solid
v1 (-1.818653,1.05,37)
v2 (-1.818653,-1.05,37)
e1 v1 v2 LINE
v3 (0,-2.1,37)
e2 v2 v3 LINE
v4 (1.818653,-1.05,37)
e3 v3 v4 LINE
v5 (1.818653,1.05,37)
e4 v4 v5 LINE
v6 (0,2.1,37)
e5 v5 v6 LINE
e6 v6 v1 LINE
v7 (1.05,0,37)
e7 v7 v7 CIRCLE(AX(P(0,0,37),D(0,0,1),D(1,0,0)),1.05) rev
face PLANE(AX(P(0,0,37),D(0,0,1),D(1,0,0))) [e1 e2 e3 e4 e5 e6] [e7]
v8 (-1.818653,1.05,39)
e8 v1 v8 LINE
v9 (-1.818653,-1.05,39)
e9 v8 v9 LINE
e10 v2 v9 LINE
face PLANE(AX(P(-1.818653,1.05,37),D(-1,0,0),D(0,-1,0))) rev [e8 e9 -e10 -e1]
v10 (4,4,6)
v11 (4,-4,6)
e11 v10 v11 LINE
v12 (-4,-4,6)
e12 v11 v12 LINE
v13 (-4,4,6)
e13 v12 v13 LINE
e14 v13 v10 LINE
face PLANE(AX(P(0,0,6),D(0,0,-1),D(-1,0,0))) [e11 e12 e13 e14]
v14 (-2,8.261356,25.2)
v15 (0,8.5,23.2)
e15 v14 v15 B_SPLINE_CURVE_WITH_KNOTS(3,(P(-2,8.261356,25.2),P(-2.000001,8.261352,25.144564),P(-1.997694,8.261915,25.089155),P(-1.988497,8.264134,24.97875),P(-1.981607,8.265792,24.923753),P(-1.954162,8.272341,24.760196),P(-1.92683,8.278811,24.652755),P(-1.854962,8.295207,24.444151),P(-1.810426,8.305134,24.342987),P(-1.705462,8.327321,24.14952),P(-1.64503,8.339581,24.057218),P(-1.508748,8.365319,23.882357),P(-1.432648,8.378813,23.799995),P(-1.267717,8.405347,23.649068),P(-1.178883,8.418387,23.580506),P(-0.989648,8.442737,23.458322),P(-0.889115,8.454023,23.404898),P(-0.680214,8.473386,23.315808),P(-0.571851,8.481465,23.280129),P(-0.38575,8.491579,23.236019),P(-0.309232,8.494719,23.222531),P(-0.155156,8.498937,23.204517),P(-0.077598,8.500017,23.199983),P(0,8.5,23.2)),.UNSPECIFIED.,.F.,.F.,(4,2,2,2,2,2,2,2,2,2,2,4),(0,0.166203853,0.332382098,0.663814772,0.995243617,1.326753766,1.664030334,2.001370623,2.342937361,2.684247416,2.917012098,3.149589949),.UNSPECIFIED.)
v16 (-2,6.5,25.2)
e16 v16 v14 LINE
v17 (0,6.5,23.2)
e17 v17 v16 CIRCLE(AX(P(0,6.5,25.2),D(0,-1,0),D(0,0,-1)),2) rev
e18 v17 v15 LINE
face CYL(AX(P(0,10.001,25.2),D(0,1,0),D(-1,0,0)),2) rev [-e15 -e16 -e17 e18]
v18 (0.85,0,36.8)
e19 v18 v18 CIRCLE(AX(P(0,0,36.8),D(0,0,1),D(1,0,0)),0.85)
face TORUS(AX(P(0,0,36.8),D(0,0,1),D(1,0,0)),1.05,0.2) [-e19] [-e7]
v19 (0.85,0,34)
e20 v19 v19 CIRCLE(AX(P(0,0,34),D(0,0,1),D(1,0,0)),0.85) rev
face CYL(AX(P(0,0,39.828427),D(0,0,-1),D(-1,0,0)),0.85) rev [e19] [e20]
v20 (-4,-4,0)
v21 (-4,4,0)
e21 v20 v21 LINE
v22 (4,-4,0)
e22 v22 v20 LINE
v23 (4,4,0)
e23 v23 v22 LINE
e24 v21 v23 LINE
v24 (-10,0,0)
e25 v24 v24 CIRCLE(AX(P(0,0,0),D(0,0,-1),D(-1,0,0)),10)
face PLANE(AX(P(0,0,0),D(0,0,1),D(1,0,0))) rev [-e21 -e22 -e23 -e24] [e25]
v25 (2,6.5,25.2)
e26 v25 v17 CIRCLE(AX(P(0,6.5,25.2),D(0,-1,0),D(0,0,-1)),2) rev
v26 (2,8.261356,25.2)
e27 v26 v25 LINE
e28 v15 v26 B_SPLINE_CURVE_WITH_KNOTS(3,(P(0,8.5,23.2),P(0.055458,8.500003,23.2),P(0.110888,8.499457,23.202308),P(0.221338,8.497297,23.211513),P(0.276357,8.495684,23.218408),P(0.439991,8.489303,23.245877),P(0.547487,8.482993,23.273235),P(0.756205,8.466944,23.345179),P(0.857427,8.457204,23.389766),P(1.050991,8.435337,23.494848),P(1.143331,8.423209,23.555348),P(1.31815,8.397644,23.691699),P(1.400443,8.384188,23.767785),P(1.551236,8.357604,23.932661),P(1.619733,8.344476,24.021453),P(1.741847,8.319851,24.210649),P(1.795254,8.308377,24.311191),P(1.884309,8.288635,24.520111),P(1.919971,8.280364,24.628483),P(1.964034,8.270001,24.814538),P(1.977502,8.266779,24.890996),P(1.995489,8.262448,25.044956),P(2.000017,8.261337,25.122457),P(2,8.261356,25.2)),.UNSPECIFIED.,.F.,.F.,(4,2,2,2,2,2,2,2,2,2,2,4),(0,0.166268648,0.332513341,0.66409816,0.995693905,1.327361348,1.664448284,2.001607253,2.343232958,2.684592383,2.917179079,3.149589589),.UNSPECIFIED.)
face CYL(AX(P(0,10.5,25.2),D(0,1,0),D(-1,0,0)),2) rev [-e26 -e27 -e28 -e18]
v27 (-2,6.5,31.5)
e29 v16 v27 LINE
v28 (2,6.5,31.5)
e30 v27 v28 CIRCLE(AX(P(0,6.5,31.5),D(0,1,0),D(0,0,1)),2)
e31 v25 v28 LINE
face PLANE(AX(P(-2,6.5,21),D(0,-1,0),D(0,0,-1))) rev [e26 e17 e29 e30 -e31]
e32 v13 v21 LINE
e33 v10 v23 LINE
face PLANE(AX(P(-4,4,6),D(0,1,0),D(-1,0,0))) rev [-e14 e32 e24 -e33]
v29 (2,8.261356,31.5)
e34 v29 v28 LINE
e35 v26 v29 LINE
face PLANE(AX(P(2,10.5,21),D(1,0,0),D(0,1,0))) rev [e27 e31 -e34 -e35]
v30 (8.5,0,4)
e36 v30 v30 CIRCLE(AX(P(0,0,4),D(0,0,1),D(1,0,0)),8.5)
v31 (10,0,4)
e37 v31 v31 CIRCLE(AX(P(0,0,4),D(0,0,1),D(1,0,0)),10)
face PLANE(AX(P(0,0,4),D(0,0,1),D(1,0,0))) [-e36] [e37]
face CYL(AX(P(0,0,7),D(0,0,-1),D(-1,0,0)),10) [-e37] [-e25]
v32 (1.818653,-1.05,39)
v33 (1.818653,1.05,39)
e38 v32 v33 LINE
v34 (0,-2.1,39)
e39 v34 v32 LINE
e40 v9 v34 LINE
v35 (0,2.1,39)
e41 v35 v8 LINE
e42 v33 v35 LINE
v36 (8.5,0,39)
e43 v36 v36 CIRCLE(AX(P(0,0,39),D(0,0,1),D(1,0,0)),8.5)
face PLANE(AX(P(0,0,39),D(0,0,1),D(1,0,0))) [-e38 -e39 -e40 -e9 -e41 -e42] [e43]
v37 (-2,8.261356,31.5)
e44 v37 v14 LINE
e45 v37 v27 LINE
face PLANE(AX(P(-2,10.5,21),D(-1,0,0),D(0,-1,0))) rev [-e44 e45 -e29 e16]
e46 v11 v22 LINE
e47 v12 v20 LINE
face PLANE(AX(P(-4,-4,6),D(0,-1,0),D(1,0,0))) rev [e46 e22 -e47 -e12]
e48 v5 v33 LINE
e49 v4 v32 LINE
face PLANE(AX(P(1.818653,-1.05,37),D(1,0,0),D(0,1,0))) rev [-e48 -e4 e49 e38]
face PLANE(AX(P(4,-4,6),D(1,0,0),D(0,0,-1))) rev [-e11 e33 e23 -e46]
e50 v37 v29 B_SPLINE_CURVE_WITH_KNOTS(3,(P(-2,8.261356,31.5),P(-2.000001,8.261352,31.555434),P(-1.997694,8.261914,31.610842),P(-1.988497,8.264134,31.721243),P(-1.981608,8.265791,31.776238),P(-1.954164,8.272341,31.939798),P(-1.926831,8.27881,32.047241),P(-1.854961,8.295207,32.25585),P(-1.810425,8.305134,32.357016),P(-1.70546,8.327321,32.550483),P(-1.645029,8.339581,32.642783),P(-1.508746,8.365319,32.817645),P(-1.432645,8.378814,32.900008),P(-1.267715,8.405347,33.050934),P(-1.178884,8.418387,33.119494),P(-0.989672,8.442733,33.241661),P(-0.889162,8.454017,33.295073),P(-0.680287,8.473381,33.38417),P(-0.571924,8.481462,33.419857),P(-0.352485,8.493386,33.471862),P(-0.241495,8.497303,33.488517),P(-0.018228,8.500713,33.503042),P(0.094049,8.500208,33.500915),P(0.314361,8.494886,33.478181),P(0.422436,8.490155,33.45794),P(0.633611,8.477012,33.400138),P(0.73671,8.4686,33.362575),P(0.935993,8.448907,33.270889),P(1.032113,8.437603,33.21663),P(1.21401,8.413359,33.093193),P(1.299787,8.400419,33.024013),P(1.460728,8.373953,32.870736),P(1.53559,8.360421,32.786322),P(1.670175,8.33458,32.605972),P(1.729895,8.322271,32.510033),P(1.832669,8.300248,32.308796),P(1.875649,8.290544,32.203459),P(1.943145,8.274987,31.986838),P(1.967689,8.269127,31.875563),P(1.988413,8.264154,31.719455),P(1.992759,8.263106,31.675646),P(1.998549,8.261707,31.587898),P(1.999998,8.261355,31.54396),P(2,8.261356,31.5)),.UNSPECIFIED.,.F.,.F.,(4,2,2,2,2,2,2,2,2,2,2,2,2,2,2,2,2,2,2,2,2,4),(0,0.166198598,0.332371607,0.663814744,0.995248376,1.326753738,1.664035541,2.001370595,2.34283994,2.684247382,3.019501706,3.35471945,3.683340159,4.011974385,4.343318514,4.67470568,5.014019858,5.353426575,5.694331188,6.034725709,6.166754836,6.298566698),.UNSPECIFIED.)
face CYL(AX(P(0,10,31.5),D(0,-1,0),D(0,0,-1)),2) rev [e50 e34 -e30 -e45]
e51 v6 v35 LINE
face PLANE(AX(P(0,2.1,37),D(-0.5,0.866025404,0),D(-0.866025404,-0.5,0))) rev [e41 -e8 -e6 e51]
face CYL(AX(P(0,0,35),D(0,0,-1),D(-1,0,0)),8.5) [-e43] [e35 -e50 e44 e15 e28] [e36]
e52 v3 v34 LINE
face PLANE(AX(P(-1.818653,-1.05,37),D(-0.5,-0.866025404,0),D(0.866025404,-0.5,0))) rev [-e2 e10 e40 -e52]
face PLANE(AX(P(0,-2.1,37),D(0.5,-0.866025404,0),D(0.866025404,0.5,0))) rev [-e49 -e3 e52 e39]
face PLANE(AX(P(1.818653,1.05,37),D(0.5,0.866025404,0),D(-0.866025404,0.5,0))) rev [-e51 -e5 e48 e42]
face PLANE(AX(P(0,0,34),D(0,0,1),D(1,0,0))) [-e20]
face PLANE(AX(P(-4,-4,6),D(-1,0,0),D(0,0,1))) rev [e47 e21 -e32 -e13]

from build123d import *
from build123d.topology import SkipClean

# Parameters (mm, degrees)
SKETCH_1_R           = 8.5
EXTRUDE_1_DEPTH      = 35
SKETCH_3_W           = 4
SKETCH_3_H           = 4
CUT_EXTRUDE_1_DEPTH  = 14
EXTRUDE_2_REACH      = 41.016
EXTRUDE_2_END_RADIUS = 8.5
EXTRUDE_3_REACH      = 41.016
EXTRUDE_3_END_RADIUS = 8.5
SKETCH_6_R           = 10
SKETCH_6_R_2         = 8.5
EXTRUDE_4_DEPTH      = 7
SKETCH_7_R           = 8.5
EXTRUDE_5_DEPTH      = 3
EXTRUDE_6_REACH      = 44.617
EXTRUDE_6_END_RADIUS = 8.5
CUT_EXTRUDE_2_DEPTH  = 43.617484675
FILLET_1_R           = 2
CUT_EXTRUDE_START    = -3
SKETCH_10_R          = 10
SKETCH_10_R_2        = 8.5
CUT_EXTRUDE_3_DEPTH  = 3
SKETCH_11_R          = 8.5
EXTRUDE_7_DEPTH      = 1
SKETCH_12_R          = 1
CUT_EXTRUDE_4_DEPTH  = 5
CUT_EXTRUDE_5_DEPTH  = 2
EXTRUDE_START        = 3
SKETCH_14_R          = 1
SKETCH_14_R_2        = 0.85
EXTRUDE_8_DEPTH      = 3
FILLET_2_R           = 0.2
SKETCH_15_W          = 8
SKETCH_15_H          = 8
CUT_EXTRUDE_6_DEPTH  = 6


with BuildPart() as part:
    # 草图1 → 凸台-拉伸1 (new body)
    with BuildSketch(Plane.XY):
        Circle(SKETCH_1_R)
    extrude(amount=EXTRUDE_1_DEPTH)

    # 草图3 → 切除-拉伸1 (cut)
    with BuildSketch(Plane.XY.offset(35)):
        with Locations((0, 8.5)):
            Rectangle(SKETCH_3_W, SKETCH_3_H)
    extrude(amount=-CUT_EXTRUDE_1_DEPTH, mode=Mode.SUBTRACT)

    # 凸台-拉伸2: up to this cylinder (the profile starts inside it)
    with SkipClean():  # the faces are left unmerged after this step: merging them gives an invalid solid
        extrude_2_end = Plane(origin=(0, 0, 21.446736), z_dir=(0, 0, -1)) * Cylinder(EXTRUDE_2_END_RADIUS, 100.032, mode=Mode.PRIVATE)
        # 草图4 → 凸台-拉伸2 (add, up to the surface)
        with BuildSketch(Plane(origin=(0, 6.5, 0), x_dir=(1, 0, 0), z_dir=(0, 1, 0)), mode=Mode.PRIVATE) as extrude_2_sk1:
            with BuildLine():
                Line((2, -21), (0, -21))
                ThreePointArc((0, -21), (1.414213562, -21.585786438), (2, -23))
                Line((2, -23), (2, -21))
            make_face()
        extrude_2_tool1 = extrude(extrude_2_sk1.sketch, amount=EXTRUDE_2_REACH, mode=Mode.PRIVATE) & extrude_2_end
        add(extrude_2_tool1.solids().sort_by_distance((1.553264, 6.5, 21.446736))[0])
        # 草图4 → 凸台-拉伸2 (add, up to the surface)
        with BuildSketch(Plane(origin=(0, 6.5, 0), x_dir=(1, 0, 0), z_dir=(0, 1, 0)), mode=Mode.PRIVATE) as extrude_2_sk2:
            with BuildLine():
                Line((-2, -21), (-2, -23))
                ThreePointArc((-2, -23), (-1.414213562, -21.585786438), (0, -21))
                Line((0, -21), (-2, -21))
            make_face()
        extrude_2_tool2 = extrude(extrude_2_sk2.sketch, amount=EXTRUDE_2_REACH, mode=Mode.PRIVATE) & extrude_2_end
        add(extrude_2_tool2.solids().sort_by_distance((-1.553264, 6.5, 21.446736))[0])

    # 凸台-拉伸3: up to this cylinder (the profile starts inside it)
    with SkipClean():  # the faces are left unmerged after this step: merging them gives an invalid solid
        extrude_3_end = Plane(origin=(0, 0, 32.762904), z_dir=(0, 0, -1)) * Cylinder(EXTRUDE_3_END_RADIUS, 100.032, mode=Mode.PRIVATE)
        # 草图5 → 凸台-拉伸3 (add, up to the surface)
        with BuildSketch(Plane(origin=(0, 6.5, 0), x_dir=(1, 0, 0), z_dir=(0, 1, 0)), mode=Mode.PRIVATE) as extrude_3_sk1:
            with BuildLine():
                Line((-2, -29), (-2, -35))
                Line((-2, -35), (2, -35))
                Line((2, -35), (2, -29))
                ThreePointArc((2, -29), (0, -31), (-2, -29))
            make_face()
        extrude_3_tool1 = extrude(extrude_3_sk1.sketch, amount=EXTRUDE_3_REACH, mode=Mode.PRIVATE) & extrude_3_end
        add(extrude_3_tool1.solids().sort_by_distance((0, 6.5, 32.762904))[0])

    # 草图6 → 凸台-拉伸4 (add)
    with BuildSketch(Plane(origin=(0, 0, 0), x_dir=(-1, 0, 0), z_dir=(0, 0, -1))):
        Circle(SKETCH_6_R)
        Circle(SKETCH_6_R_2, mode=Mode.SUBTRACT)
    extrude(amount=-EXTRUDE_4_DEPTH)

    # 草图7 → 凸台-拉伸5 (add)
    with SkipClean():  # the faces are left unmerged after this step: merging them gives an invalid solid
        with BuildSketch(Plane.XY.offset(35)):
            with Locations(Location((0, 0, 0), (0, 0, 180))):
                Circle(SKETCH_7_R)
        extrude(amount=EXTRUDE_5_DEPTH)

    # 凸台-拉伸6: up to this cylinder (the profile starts inside it)
    with SkipClean():  # the faces are left unmerged after this step: merging them gives an invalid solid
        extrude_6_end = Plane(origin=(0, 0, 22.258337), z_dir=(0, 0, -1)) * Cylinder(EXTRUDE_6_END_RADIUS, 107.234, mode=Mode.PRIVATE)
        # 草图8 → 凸台-拉伸6 (add, up to the surface)
        with BuildSketch(Plane(origin=(0, 6.5, 0), x_dir=(1, 0, 0), z_dir=(0, 1, 0)), mode=Mode.PRIVATE) as extrude_6_sk1:
            with BuildLine():
                Line((-2, -23), (-2, -23.2))
                Line((-2, -23.2), (2, -23.2))
                Line((2, -23.2), (2, -23))
                ThreePointArc((2, -23), (0, -21), (-2, -23))
            make_face()
        extrude_6_tool1 = extrude(extrude_6_sk1.sketch, amount=EXTRUDE_6_REACH, mode=Mode.PRIVATE) & extrude_6_end
        add(extrude_6_tool1.solids().sort_by_distance((0, 6.5, 22.258337))[0])

    # 草图9 → 切除-拉伸2 (cut, through all)
    with SkipClean():  # the faces are left unmerged after this step: merging them gives an invalid solid
        with BuildSketch(Plane(origin=(0, 6.5, 0), x_dir=(1, 0, 0), z_dir=(0, 1, 0))):
            with BuildLine():
                Line((-2, -29), (-2, -29.5))
                Line((-2, -29.5), (-2, -31.5))
                ThreePointArc((-2, -31.5), (0, -33.5), (2, -31.5))
                Line((2, -31.5), (2, -29.5))
                Line((2, -29.5), (2, -29))
                Line((2, -29), (-2, -29))
            make_face()
        extrude(amount=CUT_EXTRUDE_2_DEPTH, mode=Mode.SUBTRACT)

    # 圆角1
    # the kernel refuses this fillet: 2 mm, written as the material it adds along each edge
    with BuildSketch(Plane(origin=(-2, 1.5, 23.2), x_dir=(0, 0, 1), z_dir=(0, 1, 0))) as fillet_1_piece_1_section:
        with BuildLine():
            CenterArc((FILLET_1_R, FILLET_1_R), FILLET_1_R, 180, 90)
            Line((0, FILLET_1_R), (0, 0))
            Line((0, 0), (FILLET_1_R, 0))
        make_face()
    fillet_1_piece_1 = extrude(amount=11.761355821, mode=Mode.PRIVATE)
    fillet_1_piece_1 = fillet_1_piece_1 & Plane(origin=(0, 0, 23.652790229), x_dir=(1, 0, 0), z_dir=(0, 0, -1)) * Cylinder(8.5, 32, mode=Mode.PRIVATE)
    add(fillet_1_piece_1)
    with BuildSketch(Plane(origin=(2, 1.5, 23.2), x_dir=(0, 0, 1), z_dir=(0, 1, 0))) as fillet_1_piece_2_section:
        with BuildLine():
            CenterArc((FILLET_1_R, -FILLET_1_R), FILLET_1_R, 90, 90)
            Line((0, -FILLET_1_R), (0, 0))
            Line((0, 0), (FILLET_1_R, 0))
        make_face()
    fillet_1_piece_2 = extrude(amount=11.761355821, mode=Mode.PRIVATE)
    fillet_1_piece_2 = fillet_1_piece_2 & Plane(origin=(0, 0, 23.652790229), x_dir=(1, 0, 0), z_dir=(0, 0, -1)) * Cylinder(8.5, 32, mode=Mode.PRIVATE)
    add(fillet_1_piece_2)

    # 草图10 → 切除-拉伸3 (cut)
    with BuildSketch(Plane.XY.offset(7).offset(CUT_EXTRUDE_START)):
        with Locations(Location((0, 0, 0), (0, 0, 180))):
            Circle(SKETCH_10_R)
        Circle(SKETCH_10_R_2, mode=Mode.SUBTRACT)
    extrude(amount=CUT_EXTRUDE_3_DEPTH, mode=Mode.SUBTRACT)

    # 草图11 → 凸台-拉伸7 (add)
    with BuildSketch(Plane.XY.offset(38)):
        Circle(SKETCH_11_R)
    extrude(amount=EXTRUDE_7_DEPTH)

    # 草图12 → 切除-拉伸4 (cut)
    with BuildSketch(Plane.XY.offset(39)):
        Circle(SKETCH_12_R)
    extrude(amount=-CUT_EXTRUDE_4_DEPTH, mode=Mode.SUBTRACT)

    # 草图13 → 切除-拉伸5 (cut)
    with BuildSketch(Plane.XY.offset(39)):
        Polygon((0, 2.1), (-1.818653348, 1.05), (-1.818653348, -1.05), (0, -2.1), (1.818653348, -1.05), (1.818653348, 1.05), align=None)
    extrude(amount=-CUT_EXTRUDE_5_DEPTH, mode=Mode.SUBTRACT)

    # 草图14 → 凸台-拉伸8 (add)
    with BuildSketch(Plane.XY.offset(34).offset(EXTRUDE_START)):
        Circle(SKETCH_14_R)
        Circle(SKETCH_14_R_2, mode=Mode.SUBTRACT)
    extrude(amount=-EXTRUDE_8_DEPTH)

    # 圆角2
    fillet_2_edges = [part.edges().sort_by_distance(p)[0] for p in [
        (-0.85, 0, 37),
    ]]
    fillet(fillet_2_edges, radius=FILLET_2_R)

    # 草图15 → 切除-拉伸6 (cut)
    with BuildSketch(Plane(origin=(0, 0, 0), x_dir=(-1, 0, 0), z_dir=(0, 0, -1))):
        Rectangle(SKETCH_15_W, SKETCH_15_H)
    extrude(amount=-CUT_EXTRUDE_6_DEPTH, mode=Mode.SUBTRACT)


solid = part.part
